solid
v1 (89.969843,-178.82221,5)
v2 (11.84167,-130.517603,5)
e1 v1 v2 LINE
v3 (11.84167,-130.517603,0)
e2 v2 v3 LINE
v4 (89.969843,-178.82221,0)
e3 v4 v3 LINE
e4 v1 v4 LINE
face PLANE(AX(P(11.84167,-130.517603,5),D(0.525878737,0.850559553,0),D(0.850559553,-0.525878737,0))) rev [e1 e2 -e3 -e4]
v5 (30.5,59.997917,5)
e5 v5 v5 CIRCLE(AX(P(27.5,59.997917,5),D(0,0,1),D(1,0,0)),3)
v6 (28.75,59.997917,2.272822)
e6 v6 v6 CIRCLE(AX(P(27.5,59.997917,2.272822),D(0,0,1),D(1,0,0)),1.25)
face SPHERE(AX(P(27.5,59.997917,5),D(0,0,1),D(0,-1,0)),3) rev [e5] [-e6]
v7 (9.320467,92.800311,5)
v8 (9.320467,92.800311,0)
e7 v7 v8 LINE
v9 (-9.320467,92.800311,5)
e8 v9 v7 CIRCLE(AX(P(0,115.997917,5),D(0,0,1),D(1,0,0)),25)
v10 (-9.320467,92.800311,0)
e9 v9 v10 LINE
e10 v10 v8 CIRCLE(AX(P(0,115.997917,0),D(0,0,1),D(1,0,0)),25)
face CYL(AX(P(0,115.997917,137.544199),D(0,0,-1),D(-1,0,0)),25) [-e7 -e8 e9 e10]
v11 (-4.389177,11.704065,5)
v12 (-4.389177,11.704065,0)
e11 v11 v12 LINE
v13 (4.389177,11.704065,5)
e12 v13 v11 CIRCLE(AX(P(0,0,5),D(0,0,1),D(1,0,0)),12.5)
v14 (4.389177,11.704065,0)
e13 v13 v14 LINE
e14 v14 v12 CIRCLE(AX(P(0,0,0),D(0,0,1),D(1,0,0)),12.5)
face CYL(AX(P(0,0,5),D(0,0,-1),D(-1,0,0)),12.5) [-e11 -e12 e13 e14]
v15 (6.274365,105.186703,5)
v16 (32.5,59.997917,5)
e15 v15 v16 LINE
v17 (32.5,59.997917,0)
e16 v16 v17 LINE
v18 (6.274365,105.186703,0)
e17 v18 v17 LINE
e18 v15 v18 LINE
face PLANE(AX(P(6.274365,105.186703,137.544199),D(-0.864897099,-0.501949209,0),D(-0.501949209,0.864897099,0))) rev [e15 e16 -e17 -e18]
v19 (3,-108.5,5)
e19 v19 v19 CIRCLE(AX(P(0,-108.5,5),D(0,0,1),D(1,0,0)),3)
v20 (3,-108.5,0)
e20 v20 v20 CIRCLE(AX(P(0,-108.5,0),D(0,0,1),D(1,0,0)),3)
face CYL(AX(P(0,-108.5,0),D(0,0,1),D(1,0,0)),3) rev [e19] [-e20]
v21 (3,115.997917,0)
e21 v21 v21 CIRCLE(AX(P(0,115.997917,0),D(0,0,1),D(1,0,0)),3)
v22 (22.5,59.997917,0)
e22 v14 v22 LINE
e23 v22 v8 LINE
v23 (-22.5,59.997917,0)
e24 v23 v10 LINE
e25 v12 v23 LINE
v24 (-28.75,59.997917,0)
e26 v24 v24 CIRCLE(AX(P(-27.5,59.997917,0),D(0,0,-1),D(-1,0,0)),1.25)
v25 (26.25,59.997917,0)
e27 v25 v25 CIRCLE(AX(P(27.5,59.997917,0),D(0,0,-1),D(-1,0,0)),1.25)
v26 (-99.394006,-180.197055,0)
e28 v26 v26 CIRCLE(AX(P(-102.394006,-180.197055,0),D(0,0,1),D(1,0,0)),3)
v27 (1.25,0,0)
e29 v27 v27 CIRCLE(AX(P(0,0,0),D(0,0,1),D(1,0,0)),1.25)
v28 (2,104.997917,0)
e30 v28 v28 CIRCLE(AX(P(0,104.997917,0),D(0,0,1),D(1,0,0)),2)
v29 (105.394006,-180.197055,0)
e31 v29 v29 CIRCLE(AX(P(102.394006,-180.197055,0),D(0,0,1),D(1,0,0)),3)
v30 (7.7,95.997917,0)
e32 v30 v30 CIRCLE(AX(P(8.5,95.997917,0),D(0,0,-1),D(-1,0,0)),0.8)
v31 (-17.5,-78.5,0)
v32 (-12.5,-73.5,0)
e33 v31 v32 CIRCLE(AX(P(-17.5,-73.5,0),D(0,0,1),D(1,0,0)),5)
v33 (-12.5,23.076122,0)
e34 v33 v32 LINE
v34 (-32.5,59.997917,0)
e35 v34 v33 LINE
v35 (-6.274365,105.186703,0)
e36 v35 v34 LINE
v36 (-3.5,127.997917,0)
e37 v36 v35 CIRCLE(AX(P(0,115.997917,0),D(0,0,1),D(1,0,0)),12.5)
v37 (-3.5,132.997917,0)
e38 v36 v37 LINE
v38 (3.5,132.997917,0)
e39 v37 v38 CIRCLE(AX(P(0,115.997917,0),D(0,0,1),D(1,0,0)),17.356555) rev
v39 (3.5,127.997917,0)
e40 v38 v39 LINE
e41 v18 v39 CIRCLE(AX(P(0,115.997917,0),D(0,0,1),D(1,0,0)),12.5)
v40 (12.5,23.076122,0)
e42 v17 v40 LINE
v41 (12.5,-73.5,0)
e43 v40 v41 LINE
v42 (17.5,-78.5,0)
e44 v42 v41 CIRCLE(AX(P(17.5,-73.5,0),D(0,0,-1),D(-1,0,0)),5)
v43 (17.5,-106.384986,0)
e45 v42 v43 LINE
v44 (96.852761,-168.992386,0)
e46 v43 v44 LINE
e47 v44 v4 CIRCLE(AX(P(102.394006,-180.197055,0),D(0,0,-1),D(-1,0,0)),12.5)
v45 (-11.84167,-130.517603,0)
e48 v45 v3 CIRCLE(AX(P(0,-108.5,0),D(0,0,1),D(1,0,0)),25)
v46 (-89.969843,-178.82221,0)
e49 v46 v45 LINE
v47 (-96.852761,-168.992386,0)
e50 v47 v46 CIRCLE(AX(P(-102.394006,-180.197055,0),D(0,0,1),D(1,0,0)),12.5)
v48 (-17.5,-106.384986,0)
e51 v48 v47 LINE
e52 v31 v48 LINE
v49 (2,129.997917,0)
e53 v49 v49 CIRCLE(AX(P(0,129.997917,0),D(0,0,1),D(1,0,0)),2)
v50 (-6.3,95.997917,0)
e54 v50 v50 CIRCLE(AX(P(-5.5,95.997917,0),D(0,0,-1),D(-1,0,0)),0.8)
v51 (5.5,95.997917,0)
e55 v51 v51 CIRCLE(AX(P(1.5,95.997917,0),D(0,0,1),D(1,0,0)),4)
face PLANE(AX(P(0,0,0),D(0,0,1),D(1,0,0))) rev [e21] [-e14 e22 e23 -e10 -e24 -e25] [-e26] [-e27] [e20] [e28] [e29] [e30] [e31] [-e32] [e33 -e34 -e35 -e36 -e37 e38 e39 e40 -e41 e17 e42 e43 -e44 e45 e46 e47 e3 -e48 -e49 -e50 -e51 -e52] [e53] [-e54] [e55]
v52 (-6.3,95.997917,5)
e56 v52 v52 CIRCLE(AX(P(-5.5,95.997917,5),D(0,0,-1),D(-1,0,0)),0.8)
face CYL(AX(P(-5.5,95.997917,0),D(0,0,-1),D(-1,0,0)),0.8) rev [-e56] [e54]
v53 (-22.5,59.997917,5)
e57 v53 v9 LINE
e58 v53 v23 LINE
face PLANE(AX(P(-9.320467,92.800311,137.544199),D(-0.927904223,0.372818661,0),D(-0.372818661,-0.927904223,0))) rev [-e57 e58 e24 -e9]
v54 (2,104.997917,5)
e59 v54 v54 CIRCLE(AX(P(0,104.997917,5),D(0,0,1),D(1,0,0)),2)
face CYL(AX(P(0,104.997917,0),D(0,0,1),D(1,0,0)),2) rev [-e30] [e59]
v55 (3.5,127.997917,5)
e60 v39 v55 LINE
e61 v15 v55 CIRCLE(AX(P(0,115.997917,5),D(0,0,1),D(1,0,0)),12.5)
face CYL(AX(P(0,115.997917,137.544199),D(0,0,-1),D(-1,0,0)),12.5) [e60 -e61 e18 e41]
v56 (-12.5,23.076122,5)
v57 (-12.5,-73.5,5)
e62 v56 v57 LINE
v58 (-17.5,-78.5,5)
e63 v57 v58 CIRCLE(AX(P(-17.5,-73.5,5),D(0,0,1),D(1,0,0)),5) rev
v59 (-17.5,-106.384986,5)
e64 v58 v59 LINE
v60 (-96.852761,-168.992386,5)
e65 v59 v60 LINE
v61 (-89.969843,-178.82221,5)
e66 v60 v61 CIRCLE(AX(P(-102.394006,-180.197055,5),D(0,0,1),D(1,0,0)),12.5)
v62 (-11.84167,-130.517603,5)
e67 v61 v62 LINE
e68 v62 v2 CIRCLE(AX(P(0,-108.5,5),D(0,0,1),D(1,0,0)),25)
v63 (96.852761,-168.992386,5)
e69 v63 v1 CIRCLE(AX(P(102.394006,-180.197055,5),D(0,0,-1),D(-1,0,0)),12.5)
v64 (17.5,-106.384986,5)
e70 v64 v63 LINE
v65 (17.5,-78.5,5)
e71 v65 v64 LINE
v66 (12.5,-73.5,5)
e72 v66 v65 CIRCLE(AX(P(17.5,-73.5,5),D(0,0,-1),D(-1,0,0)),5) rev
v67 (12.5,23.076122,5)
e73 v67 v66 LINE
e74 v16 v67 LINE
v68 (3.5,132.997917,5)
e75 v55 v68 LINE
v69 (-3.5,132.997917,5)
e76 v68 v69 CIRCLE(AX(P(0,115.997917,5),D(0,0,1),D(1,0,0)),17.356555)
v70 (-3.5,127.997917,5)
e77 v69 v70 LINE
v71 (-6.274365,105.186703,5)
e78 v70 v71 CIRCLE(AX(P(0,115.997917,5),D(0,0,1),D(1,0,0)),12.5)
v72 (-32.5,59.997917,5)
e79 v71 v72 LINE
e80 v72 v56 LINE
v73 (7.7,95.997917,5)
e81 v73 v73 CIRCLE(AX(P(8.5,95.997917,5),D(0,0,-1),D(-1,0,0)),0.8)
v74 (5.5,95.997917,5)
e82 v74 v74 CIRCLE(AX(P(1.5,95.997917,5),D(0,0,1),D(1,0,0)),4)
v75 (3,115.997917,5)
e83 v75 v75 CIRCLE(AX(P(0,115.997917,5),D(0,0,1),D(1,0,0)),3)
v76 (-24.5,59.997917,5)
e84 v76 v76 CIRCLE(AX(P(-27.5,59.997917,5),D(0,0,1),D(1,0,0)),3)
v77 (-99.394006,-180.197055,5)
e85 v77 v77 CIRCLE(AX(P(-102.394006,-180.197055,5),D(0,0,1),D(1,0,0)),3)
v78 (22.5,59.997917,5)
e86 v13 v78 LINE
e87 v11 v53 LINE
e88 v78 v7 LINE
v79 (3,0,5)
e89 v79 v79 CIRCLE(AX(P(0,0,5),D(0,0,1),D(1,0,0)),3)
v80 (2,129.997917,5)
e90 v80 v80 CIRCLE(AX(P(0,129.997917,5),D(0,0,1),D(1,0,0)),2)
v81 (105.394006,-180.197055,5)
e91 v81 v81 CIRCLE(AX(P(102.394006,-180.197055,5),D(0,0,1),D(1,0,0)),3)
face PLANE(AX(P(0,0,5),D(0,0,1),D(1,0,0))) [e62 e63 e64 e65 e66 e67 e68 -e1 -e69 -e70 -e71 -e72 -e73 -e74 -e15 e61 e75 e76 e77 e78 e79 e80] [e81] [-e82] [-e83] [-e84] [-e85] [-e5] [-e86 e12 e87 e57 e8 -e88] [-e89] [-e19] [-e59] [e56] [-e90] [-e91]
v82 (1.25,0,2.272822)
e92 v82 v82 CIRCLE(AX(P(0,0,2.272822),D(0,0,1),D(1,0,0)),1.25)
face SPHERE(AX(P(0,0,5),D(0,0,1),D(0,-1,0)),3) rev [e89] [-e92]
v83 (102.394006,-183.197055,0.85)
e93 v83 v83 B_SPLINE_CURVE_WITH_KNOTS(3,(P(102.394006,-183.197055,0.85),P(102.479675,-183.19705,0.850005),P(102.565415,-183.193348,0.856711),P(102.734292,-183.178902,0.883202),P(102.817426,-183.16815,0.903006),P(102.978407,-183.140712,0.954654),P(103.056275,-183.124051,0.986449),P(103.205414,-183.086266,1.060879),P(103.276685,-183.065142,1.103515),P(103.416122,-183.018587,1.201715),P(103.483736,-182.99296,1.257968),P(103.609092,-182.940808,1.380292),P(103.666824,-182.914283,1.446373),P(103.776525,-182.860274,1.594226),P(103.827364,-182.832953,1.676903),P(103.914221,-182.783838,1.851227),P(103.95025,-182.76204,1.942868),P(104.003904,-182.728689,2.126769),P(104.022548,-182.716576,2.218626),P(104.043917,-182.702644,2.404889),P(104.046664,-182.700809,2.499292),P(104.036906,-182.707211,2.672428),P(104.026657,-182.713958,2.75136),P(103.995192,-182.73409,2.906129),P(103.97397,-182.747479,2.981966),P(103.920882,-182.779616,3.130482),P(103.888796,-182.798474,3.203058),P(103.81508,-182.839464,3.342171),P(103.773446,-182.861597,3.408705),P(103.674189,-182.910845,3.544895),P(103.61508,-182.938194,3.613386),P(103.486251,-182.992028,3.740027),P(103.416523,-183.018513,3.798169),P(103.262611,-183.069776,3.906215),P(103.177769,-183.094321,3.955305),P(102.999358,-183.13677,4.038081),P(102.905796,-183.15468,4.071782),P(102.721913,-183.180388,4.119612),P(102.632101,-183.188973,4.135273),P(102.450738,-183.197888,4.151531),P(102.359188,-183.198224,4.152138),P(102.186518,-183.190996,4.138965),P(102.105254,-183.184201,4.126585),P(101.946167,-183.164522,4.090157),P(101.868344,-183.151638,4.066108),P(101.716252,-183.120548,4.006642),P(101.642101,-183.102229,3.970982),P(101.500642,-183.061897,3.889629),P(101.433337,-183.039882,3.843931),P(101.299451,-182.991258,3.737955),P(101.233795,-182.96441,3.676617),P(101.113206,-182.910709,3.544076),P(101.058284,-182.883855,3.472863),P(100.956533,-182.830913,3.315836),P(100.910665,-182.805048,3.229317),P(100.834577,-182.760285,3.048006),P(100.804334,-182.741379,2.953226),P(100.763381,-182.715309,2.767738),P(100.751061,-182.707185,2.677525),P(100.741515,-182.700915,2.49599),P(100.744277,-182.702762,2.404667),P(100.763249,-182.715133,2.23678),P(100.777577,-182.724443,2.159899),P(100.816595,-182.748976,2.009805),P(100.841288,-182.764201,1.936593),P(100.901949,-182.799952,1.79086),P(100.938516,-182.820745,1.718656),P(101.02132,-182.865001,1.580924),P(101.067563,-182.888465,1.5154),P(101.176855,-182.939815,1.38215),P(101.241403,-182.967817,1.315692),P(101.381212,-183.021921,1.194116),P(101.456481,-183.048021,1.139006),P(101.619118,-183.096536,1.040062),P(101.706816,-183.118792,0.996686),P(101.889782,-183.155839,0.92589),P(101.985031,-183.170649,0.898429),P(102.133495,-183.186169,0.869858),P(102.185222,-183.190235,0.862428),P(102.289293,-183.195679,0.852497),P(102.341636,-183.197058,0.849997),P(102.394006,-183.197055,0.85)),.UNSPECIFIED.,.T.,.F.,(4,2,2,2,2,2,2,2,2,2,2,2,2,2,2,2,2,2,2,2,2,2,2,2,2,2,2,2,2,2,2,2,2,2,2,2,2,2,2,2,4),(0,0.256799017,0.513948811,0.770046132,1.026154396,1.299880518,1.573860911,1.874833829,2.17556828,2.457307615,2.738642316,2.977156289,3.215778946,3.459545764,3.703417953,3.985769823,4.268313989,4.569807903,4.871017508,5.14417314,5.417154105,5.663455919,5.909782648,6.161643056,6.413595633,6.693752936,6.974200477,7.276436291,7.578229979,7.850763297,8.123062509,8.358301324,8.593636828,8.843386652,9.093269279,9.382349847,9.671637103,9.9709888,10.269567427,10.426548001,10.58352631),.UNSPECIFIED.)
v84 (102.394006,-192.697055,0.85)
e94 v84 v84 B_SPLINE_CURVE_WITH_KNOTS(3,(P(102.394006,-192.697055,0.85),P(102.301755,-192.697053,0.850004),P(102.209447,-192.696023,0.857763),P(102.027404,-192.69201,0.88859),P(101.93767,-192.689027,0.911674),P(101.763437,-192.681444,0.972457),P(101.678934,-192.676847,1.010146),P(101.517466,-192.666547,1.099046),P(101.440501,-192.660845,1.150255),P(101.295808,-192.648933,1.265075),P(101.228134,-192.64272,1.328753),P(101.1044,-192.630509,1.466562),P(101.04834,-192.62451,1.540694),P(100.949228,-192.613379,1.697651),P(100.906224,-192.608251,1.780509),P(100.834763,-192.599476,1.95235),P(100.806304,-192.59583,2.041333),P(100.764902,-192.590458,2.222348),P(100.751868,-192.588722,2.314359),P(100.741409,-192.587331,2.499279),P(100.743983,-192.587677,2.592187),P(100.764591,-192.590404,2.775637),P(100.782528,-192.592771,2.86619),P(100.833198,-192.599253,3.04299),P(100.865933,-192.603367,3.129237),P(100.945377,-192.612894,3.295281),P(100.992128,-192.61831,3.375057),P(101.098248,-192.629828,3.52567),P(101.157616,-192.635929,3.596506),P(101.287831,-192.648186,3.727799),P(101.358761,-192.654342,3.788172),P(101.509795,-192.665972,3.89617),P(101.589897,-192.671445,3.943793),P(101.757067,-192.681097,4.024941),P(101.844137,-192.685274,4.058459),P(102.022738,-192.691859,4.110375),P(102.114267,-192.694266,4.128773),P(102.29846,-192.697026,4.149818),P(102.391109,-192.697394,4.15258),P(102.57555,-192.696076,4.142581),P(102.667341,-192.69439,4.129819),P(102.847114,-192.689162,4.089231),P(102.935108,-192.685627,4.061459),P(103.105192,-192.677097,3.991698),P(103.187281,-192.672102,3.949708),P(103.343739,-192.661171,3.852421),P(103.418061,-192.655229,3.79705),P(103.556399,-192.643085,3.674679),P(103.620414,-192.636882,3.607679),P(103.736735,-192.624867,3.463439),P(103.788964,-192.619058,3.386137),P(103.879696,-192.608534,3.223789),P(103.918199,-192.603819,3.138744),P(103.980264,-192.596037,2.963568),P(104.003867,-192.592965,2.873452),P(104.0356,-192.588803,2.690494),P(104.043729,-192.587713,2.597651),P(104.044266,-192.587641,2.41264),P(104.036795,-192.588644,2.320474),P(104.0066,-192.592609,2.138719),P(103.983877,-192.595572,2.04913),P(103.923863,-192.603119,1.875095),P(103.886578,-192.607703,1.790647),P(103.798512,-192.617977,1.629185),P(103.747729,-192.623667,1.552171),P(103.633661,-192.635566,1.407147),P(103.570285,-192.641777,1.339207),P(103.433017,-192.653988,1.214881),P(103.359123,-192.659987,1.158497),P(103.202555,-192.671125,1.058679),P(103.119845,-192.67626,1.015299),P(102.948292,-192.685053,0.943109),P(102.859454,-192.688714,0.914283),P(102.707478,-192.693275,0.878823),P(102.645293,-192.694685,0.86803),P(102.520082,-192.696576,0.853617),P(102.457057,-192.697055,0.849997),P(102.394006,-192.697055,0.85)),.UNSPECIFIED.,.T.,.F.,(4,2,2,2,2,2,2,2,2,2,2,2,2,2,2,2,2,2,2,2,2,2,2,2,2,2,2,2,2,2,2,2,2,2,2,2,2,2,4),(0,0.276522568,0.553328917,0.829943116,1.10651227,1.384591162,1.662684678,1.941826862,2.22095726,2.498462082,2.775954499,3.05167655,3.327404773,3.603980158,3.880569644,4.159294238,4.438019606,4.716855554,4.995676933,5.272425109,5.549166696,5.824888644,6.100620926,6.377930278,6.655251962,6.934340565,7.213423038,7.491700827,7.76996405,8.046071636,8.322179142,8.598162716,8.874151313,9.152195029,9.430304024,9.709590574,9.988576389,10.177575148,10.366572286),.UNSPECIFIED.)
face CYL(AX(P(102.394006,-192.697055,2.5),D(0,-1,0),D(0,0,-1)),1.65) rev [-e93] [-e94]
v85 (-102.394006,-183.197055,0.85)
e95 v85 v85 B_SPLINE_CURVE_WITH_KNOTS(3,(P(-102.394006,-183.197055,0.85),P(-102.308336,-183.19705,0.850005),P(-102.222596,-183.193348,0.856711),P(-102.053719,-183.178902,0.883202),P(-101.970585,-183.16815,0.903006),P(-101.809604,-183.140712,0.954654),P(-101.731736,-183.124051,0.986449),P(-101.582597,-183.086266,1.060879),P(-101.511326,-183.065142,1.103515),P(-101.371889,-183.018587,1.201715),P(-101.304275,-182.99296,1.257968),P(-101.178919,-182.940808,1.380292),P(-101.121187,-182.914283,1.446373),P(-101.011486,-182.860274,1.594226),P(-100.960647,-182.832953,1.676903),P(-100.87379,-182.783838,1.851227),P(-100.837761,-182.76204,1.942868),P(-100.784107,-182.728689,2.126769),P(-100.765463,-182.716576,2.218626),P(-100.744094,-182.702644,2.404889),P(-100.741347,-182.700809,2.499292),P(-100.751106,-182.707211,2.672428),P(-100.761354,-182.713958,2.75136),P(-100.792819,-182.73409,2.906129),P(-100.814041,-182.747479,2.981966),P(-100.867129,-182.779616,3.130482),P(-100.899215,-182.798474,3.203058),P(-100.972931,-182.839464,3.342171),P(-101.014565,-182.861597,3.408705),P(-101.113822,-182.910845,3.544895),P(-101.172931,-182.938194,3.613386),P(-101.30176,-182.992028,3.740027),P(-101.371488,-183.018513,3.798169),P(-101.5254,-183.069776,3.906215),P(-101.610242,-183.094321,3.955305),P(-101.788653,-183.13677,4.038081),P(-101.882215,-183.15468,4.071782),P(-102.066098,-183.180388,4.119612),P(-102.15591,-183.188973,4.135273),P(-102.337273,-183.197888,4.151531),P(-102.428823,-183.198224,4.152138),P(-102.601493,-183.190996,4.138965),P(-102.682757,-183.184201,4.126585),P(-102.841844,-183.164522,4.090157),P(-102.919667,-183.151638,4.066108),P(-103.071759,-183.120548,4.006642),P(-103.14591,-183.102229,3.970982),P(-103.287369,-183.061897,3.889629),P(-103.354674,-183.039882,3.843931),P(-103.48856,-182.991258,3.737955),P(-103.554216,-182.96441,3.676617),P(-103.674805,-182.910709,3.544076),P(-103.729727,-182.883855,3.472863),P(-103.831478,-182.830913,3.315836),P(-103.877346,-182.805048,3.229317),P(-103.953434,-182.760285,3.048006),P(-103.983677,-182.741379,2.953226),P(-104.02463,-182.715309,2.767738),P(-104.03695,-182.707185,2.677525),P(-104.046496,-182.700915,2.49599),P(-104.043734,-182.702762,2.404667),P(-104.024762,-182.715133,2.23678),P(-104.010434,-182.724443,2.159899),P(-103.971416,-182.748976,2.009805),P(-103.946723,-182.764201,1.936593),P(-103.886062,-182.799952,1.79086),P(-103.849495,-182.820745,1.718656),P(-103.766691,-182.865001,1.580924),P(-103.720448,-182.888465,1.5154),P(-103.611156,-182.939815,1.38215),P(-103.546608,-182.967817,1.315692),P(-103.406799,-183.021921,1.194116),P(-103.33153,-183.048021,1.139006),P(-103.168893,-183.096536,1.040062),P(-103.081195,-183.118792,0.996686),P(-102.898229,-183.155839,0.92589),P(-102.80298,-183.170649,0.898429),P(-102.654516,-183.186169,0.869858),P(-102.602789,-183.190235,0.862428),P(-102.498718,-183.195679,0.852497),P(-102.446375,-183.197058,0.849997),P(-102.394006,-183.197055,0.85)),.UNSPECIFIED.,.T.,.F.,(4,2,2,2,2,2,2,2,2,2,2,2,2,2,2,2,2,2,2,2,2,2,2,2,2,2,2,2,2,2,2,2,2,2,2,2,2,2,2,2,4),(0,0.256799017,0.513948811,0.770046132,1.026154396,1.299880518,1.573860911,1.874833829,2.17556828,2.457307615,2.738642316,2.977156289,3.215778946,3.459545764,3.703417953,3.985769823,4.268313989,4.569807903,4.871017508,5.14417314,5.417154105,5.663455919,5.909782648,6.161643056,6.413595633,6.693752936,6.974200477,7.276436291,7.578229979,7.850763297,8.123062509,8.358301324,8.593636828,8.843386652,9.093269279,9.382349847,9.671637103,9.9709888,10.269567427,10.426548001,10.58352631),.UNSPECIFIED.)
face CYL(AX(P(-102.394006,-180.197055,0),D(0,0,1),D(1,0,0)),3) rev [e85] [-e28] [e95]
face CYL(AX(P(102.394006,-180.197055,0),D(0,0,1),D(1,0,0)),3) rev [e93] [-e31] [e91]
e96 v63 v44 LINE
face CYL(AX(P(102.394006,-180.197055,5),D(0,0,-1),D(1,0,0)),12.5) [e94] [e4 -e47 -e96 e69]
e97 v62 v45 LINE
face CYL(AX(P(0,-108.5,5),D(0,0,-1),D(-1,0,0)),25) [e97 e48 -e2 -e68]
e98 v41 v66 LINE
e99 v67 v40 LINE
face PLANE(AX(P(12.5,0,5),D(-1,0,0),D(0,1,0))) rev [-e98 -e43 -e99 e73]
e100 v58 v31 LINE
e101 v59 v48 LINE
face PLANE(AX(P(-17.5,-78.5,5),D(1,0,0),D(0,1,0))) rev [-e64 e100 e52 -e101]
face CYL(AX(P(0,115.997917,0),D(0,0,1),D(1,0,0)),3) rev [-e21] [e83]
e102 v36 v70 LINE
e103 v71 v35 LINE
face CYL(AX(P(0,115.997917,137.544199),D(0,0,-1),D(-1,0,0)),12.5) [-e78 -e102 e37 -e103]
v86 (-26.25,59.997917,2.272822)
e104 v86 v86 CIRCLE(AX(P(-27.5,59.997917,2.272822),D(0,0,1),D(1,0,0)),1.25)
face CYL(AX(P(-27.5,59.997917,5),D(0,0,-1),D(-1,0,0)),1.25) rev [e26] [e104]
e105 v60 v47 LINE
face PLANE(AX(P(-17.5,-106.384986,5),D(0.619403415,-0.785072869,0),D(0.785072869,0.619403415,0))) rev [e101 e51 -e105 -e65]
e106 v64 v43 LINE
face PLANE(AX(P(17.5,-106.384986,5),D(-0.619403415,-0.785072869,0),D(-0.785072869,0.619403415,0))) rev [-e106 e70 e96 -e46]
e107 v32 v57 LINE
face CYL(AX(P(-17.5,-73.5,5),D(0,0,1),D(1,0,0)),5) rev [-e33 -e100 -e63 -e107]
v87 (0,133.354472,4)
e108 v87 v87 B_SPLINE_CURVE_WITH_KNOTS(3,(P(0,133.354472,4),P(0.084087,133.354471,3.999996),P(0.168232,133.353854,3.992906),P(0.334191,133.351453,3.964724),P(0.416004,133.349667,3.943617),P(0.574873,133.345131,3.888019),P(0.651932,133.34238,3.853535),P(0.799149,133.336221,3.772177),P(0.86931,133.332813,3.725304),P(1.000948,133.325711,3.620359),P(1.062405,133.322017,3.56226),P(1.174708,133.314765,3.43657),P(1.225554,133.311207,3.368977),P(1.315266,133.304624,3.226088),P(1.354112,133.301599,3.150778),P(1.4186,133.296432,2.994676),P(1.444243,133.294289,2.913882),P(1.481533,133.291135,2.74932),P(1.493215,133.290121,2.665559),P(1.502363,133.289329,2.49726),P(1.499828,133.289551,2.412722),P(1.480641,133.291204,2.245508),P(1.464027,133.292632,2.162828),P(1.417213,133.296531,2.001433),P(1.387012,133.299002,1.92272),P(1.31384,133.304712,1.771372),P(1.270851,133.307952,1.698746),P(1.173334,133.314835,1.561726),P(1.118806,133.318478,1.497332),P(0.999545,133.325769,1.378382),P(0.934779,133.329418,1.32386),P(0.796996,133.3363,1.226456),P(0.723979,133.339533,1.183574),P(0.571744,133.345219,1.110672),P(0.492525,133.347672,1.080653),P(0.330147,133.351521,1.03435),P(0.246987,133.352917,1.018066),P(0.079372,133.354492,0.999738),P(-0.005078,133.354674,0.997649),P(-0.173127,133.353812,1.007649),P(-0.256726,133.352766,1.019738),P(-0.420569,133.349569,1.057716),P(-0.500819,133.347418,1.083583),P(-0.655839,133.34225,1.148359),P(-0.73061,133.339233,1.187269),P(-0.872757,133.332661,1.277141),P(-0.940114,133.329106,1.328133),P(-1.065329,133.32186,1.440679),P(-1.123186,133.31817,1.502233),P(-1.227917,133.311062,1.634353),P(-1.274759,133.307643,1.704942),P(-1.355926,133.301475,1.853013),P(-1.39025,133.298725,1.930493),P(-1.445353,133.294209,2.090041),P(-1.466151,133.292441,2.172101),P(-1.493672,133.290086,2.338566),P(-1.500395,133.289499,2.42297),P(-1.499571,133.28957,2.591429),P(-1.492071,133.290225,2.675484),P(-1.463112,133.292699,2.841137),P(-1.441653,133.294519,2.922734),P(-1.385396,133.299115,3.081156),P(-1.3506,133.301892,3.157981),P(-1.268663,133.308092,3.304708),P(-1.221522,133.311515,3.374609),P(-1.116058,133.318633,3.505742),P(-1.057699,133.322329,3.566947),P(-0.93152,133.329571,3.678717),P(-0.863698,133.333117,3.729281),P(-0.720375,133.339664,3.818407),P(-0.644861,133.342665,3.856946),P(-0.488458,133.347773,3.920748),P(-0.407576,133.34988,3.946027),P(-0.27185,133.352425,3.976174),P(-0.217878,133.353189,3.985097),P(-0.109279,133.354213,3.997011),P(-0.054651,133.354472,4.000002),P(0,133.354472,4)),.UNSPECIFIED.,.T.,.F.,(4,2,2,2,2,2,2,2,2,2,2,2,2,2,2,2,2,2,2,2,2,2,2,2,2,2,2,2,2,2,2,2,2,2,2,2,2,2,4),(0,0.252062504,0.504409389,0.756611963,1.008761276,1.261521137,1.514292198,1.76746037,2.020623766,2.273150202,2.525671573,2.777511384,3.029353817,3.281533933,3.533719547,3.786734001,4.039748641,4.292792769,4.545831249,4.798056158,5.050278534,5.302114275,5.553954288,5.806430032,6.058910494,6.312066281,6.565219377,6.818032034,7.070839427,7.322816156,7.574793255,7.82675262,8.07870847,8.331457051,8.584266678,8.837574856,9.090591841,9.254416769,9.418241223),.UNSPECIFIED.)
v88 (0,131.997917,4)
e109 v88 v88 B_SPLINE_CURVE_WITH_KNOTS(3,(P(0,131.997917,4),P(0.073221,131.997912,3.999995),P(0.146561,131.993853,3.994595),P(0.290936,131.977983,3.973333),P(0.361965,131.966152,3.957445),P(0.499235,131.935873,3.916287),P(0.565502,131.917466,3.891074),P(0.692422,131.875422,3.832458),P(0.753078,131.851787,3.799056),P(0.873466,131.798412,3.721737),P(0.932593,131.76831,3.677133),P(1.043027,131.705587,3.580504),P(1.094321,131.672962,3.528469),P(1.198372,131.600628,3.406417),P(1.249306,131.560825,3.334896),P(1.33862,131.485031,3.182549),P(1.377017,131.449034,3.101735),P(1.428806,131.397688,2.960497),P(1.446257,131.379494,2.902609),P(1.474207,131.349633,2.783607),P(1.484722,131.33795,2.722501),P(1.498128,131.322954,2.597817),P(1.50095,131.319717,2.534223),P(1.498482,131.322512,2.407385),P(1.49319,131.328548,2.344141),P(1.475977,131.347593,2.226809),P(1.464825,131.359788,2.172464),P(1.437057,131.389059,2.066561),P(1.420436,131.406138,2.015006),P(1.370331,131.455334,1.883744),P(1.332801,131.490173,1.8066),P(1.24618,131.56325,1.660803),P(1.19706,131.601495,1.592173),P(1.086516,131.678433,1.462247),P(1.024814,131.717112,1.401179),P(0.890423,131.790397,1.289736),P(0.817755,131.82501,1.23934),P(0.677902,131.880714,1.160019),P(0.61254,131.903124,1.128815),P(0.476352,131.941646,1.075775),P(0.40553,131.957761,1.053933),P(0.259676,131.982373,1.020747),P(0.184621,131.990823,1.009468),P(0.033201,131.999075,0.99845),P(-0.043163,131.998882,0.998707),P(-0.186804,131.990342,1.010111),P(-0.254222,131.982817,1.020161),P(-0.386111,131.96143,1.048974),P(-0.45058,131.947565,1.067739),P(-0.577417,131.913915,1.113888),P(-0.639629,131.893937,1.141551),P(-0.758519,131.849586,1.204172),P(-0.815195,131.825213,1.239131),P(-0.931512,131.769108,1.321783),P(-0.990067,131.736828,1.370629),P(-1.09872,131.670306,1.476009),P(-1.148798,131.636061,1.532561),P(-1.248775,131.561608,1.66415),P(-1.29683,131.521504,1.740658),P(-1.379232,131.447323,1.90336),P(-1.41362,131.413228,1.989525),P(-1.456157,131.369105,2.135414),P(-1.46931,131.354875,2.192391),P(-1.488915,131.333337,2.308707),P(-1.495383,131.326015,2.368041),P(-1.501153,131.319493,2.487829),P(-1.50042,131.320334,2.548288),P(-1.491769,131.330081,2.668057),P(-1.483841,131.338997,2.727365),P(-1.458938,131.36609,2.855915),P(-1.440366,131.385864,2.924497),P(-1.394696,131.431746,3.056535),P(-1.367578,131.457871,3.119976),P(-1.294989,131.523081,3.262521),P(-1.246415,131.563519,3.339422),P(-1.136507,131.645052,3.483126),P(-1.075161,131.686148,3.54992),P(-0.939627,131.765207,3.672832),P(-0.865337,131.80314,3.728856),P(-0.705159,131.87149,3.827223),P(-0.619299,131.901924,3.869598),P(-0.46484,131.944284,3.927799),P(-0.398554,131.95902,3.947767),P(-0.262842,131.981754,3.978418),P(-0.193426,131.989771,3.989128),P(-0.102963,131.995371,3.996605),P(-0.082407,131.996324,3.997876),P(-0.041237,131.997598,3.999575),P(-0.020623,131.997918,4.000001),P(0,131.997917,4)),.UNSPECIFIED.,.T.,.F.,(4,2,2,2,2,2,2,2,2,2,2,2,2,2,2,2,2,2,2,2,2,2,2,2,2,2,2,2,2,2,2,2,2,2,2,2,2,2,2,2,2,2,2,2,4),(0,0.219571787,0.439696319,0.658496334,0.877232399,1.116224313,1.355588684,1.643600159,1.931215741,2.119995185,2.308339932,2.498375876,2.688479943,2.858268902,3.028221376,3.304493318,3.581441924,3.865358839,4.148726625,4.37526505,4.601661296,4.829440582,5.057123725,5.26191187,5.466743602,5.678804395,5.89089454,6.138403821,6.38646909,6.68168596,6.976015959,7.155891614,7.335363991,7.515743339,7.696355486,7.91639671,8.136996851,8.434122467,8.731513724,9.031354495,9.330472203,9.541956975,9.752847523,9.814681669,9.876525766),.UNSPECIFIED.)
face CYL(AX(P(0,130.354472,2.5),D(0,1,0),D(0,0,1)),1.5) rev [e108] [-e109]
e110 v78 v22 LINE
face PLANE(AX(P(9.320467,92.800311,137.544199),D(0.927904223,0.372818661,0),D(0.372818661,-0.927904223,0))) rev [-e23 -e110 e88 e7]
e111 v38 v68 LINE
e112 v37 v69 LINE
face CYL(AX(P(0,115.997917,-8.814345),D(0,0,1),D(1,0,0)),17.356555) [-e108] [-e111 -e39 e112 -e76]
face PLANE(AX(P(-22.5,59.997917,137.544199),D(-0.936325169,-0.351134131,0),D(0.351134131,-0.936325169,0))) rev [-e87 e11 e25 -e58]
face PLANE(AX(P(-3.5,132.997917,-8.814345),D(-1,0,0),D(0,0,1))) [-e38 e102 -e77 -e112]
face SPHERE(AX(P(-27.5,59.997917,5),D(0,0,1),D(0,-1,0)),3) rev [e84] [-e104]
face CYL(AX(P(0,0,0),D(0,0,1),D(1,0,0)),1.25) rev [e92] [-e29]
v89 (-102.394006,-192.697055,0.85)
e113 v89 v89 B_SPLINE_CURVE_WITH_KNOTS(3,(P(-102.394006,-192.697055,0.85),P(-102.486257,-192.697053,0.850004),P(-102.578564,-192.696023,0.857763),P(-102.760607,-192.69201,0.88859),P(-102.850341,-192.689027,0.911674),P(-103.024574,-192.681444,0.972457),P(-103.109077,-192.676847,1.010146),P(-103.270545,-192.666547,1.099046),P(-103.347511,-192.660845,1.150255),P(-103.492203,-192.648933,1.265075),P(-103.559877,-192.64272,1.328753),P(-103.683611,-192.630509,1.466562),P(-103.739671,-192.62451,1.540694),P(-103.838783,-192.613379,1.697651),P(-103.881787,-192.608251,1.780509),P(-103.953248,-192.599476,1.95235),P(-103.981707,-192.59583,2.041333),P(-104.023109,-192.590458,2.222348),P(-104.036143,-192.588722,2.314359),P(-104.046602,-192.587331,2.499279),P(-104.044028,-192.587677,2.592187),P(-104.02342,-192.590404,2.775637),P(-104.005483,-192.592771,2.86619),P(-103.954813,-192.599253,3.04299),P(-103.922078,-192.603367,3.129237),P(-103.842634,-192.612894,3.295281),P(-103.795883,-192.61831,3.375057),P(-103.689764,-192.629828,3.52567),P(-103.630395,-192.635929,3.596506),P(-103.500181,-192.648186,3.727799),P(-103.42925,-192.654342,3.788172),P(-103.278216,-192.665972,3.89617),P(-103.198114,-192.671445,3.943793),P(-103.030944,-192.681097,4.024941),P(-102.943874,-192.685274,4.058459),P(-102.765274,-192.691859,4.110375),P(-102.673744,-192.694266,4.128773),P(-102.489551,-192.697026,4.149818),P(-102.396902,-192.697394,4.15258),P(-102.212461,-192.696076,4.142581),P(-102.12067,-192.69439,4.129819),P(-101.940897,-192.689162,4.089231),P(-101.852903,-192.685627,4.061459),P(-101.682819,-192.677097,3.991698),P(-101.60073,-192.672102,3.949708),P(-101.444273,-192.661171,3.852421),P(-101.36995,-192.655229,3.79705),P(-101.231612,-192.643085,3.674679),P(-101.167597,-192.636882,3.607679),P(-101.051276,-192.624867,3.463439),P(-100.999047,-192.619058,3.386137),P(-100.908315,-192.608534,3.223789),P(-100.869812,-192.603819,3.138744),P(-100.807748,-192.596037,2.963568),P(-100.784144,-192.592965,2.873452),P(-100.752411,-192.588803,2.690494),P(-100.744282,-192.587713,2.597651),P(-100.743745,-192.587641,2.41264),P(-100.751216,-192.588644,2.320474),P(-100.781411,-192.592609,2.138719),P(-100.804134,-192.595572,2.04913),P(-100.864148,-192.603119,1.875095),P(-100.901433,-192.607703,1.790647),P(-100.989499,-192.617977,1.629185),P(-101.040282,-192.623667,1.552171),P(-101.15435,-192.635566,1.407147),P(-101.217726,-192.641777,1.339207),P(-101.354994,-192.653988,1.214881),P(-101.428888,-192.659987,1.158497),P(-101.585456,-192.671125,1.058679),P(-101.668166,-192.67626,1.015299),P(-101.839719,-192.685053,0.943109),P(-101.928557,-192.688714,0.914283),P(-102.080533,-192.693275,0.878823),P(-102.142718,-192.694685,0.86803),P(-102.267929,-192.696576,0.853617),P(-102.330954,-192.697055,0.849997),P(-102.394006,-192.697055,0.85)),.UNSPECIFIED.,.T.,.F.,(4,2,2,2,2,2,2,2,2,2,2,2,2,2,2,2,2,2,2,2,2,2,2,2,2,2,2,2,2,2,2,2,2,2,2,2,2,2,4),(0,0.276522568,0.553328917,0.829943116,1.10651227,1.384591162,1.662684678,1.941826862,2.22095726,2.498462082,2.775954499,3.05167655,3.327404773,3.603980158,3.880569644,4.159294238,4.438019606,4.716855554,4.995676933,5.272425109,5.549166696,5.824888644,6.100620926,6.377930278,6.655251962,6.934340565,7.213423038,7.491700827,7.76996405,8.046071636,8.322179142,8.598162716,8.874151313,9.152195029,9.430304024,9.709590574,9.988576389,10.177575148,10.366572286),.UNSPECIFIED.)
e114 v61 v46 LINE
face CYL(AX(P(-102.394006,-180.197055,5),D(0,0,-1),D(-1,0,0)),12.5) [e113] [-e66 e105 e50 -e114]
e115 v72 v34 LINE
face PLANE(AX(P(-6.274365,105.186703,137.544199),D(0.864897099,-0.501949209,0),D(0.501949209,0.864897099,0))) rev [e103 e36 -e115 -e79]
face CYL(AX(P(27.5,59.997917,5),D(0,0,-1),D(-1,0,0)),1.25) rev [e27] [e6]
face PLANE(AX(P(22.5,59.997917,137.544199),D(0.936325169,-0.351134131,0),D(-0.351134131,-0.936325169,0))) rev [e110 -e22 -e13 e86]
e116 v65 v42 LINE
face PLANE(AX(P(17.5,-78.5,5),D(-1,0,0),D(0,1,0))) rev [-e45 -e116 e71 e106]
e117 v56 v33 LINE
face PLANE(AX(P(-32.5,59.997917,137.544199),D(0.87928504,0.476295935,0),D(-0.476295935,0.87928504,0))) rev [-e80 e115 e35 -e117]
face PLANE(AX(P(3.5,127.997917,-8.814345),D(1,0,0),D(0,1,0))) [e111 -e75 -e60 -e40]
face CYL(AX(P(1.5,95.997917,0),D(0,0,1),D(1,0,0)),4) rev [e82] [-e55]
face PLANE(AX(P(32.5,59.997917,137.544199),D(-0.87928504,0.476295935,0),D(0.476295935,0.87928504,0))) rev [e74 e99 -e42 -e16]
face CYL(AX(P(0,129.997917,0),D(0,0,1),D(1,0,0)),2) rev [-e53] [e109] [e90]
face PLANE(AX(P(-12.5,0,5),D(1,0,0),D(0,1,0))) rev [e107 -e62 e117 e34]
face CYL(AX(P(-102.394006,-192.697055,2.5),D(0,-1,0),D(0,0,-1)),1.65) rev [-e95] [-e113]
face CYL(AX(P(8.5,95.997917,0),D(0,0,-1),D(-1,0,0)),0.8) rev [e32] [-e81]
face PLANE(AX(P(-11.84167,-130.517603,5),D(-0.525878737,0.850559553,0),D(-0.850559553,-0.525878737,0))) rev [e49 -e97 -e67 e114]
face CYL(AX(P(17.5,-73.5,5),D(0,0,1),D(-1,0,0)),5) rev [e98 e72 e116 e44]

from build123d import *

# Parameters (mm, degrees)
BOSS_EXTRUDE1_DEPTH       = 5
BOSS_EXTRUDE2_DEPTH       = 5
FILLET2_R                 = 5
SKETCH2_R                 = 3
CUT_EXTRUDE1_DEPTH        = 225.405408442
SKETCH4_R                 = 3
CUT_EXTRUDE2_DEPTH        = 225.405408442
SKETCH5_R                 = 1.25
CUT_EXTRUDE3_DEPTH        = 225.405408442
SKETCH8_R                 = 1.25
CUT_EXTRUDE4_DEPTH        = 225.405408442
BOSS_EXTRUDE3_DEPTH       = 5
SKETCH15_R                = 2
CUT_EXTRUDE8_DEPTH        = 225.405408442
SKETCH17_R                = 1.5
CUT_EXTRUDE9_DEPTH        = 3
SKETCH19_R                = 4
CUT_EXTRUDE11_DEPTH       = 225.405408444
M2X0_4_TAPPED_HOLE2_D     = 1.6
M4X0_7_TAPPED_HOLE1_D     = 3.3
M4X0_7_TAPPED_HOLE1_DEPTH = 11.5
M4X0_7_TAPPED_HOLE1_TIP   = 0.991420021


with BuildPart() as part:
    # Sketch1 → Boss-Extrude1 (new body)
    with BuildSketch(Plane.XY):
        with BuildLine():
            Line((-12.5, 0), (-12.5, -78.5))
            Line((-12.5, -78.5), (-17.5, -78.5))
            Line((-17.5, -78.5), (-17.5, -106.384985834))
            Line((-17.5, -106.384985834), (-96.852760713, -168.992385615))
            ThreePointArc((-96.852760713, -168.992385615), (-112.63340609, -187.366759998), (-89.969843477, -178.822210146))
            Line((-89.969843477, -178.822210146), (-11.841670305, -130.517603057))
            ThreePointArc((-11.841670305, -130.517603057), (-6.105731879, -132.742937904), (0, -133.5))
            Line((0, -133.5), (0, -108.5))
            Line((0, -108.5), (0, 0))
            Line((0, 0), (0, 12.5))
            ThreePointArc((0, 12.5), (-8.838834765, 8.838834765), (-12.5, 0))
        make_face()
    extrude(amount=BOSS_EXTRUDE1_DEPTH)

    # Sketch3 → Boss-Extrude2 (add)
    with BuildSketch(Plane.XY):
        with BuildLine():
            Line((-22.5, 59.99791663), (0, 0))
            Line((0, 0), (-12.5, 0))
            Line((-12.5, 0), (-12.5, 23.076121781))
            Line((-12.5, 23.076121781), (-32.5, 59.99791663))
            Line((-32.5, 59.99791663), (-6.274365114, 105.186702896))
            ThreePointArc((-6.274365114, 105.186702896), (-12.070421941, 119.246749368), (0, 128.49791663))
            Line((0, 128.49791663), (0, 115.99791663))
            Line((0, 115.99791663), (0, 90.99791663))
            ThreePointArc((0, 90.99791663), (-4.74657039, 91.452650905), (-9.320466521, 92.800311068))
            Line((-9.320466521, 92.800311068), (-22.5, 59.99791663))
        make_face()
    extrude(amount=BOSS_EXTRUDE2_DEPTH)

    # Fillet2
    fillet2_edges = [part.edges().sort_by_distance(p)[0] for p in [
        (-12.5, -78.5, 2.5),
    ]]
    fillet(fillet2_edges, radius=FILLET2_R - 0.0001)  # a hair under: the kernel refuses the full size

    # Mirror1: part across plane


with BuildPart() as part_1:
    add(part.part)
    add(part.part.mirror(Plane(origin=(0, -133.5, 5), x_dir=(0, 0, 1), z_dir=(-1, 0, 0))))

    # Sketch2 → Cut-Extrude1 (cut, through all)
    with BuildSketch(Plane.XY.offset(5)):
        with Locations((0, -108.5)):
            Circle(SKETCH2_R)
    extrude(amount=-CUT_EXTRUDE1_DEPTH, mode=Mode.SUBTRACT)

    # Sketch4 → Cut-Extrude2 (cut, through all)
    with BuildSketch(Plane.XY.offset(5)):
        with Locations((-102.394005536, -180.197054544)):
            Circle(SKETCH4_R)
        with Locations((102.394005536, -180.197054544)):
            Circle(SKETCH4_R)
        with Locations((0, 115.99791663)):
            Circle(SKETCH4_R)
    extrude(amount=-CUT_EXTRUDE2_DEPTH, mode=Mode.SUBTRACT)

    # Sketch5 → Cut-Extrude3 (cut, through all)
    with BuildSketch(Plane.XY.offset(5)):
        Circle(SKETCH5_R)
    extrude(amount=-CUT_EXTRUDE3_DEPTH, mode=Mode.SUBTRACT)

    # Sketch7 → Cut-Revolve2 (revolve, cut)
    with BuildSketch(Plane(origin=(0, 0, 0), x_dir=(0, 0, -1), z_dir=(1, 0, 0)), mode=Mode.PRIVATE) as cut_revolve2_sk:
        with BuildLine():
            Line((-5, 0), (-2, 0))
            ThreePointArc((-2, 0), (-2.878679656, -2.121320344), (-5, -3))
            Line((-5, -3), (-5, 0))
        make_face()
    cut_revolve2 = revolve(cut_revolve2_sk.sketch.rotate(Axis((0, 0, 5), (0, 0, -1)), 270), axis=Axis((0, 0, 5), (0, 0, -1)), mode=Mode.SUBTRACT)

    # Sketch8 → Cut-Extrude4 (cut, through all)
    with BuildSketch(Plane(origin=(0, 0, 0), x_dir=(-1, 0, 0), z_dir=(0, 0, -1))):
        with Locations((-27.5, 59.99791663)):
            Circle(SKETCH8_R)
        with Locations((27.5, 59.99791663)):
            Circle(SKETCH8_R)
    extrude(amount=-CUT_EXTRUDE4_DEPTH, mode=Mode.SUBTRACT)

    # Sketch14 → Boss-Extrude3 (add)
    with BuildSketch(Plane.XY.offset(5)):
        with BuildLine():
            Line((-3.5, 127.99791663), (3.5, 127.99791663))
            Line((3.5, 127.99791663), (3.5, 132.99791663))
            ThreePointArc((3.5, 132.99791663), (0, 133.354471588), (-3.5, 132.99791663))
            Line((-3.5, 132.99791663), (-3.5, 127.99791663))
        make_face()
    extrude(amount=-BOSS_EXTRUDE3_DEPTH)

    # Sketch15 → Cut-Extrude8 (cut, through all)
    with BuildSketch(Plane.XY.offset(5)):
        with Locations((0, 104.99791663)):
            Circle(SKETCH15_R)
        with Locations((0, 129.99791663)):
            Circle(SKETCH15_R)
    extrude(amount=-CUT_EXTRUDE8_DEPTH, mode=Mode.SUBTRACT)

    # Sketch17 → Cut-Extrude9 (cut)
    with BuildSketch(Plane(origin=(0, 133.354471588, 0), x_dir=(1, 0, 0), z_dir=(0, 1, 0))):
        with Locations(Location((0, -2.5, 0), (0, 0, 270))):
            Circle(SKETCH17_R)
    extrude(amount=-CUT_EXTRUDE9_DEPTH, mode=Mode.SUBTRACT)

    # Sketch19 → Cut-Extrude11 (cut, through all)
    with BuildSketch(Plane.XY.offset(5)):
        with Locations((1.5, 95.99791663)):
            Circle(SKETCH19_R)
    extrude(amount=-CUT_EXTRUDE11_DEPTH, mode=Mode.SUBTRACT)

    # M2x0.4 Tapped Hole2 (through all)
    with Locations(Plane(origin=(0, 0, 0), x_dir=(1, 0, 0), z_dir=(0, 0, -1))):
        with Locations((8.5, -95.99791663), (-5.5, -95.99791663)):
            Hole(M2X0_4_TAPPED_HOLE2_D / 2)

    # Sketch-Pattern1: Cut-Revolve2 at 2 more places
    with Locations((27.5, 59.997917, 0), (-27.5, 59.997917, 0)):
        add(cut_revolve2, mode=Mode.SUBTRACT)

    # M4x0.7 Tapped Hole1
    with Locations(Plane.XZ.offset(192.697054544)):
        with Locations((102.394005536, 2.5), (-102.394005536, 2.5)):
            Hole(M4X0_7_TAPPED_HOLE1_D / 2, depth=M4X0_7_TAPPED_HOLE1_DEPTH)
            with Locations((0, 0, -(M4X0_7_TAPPED_HOLE1_DEPTH + M4X0_7_TAPPED_HOLE1_TIP / 2))):  # 118° drill point
                Cone(0, M4X0_7_TAPPED_HOLE1_D / 2, M4X0_7_TAPPED_HOLE1_TIP, mode=Mode.SUBTRACT)


solid = part_1.part
